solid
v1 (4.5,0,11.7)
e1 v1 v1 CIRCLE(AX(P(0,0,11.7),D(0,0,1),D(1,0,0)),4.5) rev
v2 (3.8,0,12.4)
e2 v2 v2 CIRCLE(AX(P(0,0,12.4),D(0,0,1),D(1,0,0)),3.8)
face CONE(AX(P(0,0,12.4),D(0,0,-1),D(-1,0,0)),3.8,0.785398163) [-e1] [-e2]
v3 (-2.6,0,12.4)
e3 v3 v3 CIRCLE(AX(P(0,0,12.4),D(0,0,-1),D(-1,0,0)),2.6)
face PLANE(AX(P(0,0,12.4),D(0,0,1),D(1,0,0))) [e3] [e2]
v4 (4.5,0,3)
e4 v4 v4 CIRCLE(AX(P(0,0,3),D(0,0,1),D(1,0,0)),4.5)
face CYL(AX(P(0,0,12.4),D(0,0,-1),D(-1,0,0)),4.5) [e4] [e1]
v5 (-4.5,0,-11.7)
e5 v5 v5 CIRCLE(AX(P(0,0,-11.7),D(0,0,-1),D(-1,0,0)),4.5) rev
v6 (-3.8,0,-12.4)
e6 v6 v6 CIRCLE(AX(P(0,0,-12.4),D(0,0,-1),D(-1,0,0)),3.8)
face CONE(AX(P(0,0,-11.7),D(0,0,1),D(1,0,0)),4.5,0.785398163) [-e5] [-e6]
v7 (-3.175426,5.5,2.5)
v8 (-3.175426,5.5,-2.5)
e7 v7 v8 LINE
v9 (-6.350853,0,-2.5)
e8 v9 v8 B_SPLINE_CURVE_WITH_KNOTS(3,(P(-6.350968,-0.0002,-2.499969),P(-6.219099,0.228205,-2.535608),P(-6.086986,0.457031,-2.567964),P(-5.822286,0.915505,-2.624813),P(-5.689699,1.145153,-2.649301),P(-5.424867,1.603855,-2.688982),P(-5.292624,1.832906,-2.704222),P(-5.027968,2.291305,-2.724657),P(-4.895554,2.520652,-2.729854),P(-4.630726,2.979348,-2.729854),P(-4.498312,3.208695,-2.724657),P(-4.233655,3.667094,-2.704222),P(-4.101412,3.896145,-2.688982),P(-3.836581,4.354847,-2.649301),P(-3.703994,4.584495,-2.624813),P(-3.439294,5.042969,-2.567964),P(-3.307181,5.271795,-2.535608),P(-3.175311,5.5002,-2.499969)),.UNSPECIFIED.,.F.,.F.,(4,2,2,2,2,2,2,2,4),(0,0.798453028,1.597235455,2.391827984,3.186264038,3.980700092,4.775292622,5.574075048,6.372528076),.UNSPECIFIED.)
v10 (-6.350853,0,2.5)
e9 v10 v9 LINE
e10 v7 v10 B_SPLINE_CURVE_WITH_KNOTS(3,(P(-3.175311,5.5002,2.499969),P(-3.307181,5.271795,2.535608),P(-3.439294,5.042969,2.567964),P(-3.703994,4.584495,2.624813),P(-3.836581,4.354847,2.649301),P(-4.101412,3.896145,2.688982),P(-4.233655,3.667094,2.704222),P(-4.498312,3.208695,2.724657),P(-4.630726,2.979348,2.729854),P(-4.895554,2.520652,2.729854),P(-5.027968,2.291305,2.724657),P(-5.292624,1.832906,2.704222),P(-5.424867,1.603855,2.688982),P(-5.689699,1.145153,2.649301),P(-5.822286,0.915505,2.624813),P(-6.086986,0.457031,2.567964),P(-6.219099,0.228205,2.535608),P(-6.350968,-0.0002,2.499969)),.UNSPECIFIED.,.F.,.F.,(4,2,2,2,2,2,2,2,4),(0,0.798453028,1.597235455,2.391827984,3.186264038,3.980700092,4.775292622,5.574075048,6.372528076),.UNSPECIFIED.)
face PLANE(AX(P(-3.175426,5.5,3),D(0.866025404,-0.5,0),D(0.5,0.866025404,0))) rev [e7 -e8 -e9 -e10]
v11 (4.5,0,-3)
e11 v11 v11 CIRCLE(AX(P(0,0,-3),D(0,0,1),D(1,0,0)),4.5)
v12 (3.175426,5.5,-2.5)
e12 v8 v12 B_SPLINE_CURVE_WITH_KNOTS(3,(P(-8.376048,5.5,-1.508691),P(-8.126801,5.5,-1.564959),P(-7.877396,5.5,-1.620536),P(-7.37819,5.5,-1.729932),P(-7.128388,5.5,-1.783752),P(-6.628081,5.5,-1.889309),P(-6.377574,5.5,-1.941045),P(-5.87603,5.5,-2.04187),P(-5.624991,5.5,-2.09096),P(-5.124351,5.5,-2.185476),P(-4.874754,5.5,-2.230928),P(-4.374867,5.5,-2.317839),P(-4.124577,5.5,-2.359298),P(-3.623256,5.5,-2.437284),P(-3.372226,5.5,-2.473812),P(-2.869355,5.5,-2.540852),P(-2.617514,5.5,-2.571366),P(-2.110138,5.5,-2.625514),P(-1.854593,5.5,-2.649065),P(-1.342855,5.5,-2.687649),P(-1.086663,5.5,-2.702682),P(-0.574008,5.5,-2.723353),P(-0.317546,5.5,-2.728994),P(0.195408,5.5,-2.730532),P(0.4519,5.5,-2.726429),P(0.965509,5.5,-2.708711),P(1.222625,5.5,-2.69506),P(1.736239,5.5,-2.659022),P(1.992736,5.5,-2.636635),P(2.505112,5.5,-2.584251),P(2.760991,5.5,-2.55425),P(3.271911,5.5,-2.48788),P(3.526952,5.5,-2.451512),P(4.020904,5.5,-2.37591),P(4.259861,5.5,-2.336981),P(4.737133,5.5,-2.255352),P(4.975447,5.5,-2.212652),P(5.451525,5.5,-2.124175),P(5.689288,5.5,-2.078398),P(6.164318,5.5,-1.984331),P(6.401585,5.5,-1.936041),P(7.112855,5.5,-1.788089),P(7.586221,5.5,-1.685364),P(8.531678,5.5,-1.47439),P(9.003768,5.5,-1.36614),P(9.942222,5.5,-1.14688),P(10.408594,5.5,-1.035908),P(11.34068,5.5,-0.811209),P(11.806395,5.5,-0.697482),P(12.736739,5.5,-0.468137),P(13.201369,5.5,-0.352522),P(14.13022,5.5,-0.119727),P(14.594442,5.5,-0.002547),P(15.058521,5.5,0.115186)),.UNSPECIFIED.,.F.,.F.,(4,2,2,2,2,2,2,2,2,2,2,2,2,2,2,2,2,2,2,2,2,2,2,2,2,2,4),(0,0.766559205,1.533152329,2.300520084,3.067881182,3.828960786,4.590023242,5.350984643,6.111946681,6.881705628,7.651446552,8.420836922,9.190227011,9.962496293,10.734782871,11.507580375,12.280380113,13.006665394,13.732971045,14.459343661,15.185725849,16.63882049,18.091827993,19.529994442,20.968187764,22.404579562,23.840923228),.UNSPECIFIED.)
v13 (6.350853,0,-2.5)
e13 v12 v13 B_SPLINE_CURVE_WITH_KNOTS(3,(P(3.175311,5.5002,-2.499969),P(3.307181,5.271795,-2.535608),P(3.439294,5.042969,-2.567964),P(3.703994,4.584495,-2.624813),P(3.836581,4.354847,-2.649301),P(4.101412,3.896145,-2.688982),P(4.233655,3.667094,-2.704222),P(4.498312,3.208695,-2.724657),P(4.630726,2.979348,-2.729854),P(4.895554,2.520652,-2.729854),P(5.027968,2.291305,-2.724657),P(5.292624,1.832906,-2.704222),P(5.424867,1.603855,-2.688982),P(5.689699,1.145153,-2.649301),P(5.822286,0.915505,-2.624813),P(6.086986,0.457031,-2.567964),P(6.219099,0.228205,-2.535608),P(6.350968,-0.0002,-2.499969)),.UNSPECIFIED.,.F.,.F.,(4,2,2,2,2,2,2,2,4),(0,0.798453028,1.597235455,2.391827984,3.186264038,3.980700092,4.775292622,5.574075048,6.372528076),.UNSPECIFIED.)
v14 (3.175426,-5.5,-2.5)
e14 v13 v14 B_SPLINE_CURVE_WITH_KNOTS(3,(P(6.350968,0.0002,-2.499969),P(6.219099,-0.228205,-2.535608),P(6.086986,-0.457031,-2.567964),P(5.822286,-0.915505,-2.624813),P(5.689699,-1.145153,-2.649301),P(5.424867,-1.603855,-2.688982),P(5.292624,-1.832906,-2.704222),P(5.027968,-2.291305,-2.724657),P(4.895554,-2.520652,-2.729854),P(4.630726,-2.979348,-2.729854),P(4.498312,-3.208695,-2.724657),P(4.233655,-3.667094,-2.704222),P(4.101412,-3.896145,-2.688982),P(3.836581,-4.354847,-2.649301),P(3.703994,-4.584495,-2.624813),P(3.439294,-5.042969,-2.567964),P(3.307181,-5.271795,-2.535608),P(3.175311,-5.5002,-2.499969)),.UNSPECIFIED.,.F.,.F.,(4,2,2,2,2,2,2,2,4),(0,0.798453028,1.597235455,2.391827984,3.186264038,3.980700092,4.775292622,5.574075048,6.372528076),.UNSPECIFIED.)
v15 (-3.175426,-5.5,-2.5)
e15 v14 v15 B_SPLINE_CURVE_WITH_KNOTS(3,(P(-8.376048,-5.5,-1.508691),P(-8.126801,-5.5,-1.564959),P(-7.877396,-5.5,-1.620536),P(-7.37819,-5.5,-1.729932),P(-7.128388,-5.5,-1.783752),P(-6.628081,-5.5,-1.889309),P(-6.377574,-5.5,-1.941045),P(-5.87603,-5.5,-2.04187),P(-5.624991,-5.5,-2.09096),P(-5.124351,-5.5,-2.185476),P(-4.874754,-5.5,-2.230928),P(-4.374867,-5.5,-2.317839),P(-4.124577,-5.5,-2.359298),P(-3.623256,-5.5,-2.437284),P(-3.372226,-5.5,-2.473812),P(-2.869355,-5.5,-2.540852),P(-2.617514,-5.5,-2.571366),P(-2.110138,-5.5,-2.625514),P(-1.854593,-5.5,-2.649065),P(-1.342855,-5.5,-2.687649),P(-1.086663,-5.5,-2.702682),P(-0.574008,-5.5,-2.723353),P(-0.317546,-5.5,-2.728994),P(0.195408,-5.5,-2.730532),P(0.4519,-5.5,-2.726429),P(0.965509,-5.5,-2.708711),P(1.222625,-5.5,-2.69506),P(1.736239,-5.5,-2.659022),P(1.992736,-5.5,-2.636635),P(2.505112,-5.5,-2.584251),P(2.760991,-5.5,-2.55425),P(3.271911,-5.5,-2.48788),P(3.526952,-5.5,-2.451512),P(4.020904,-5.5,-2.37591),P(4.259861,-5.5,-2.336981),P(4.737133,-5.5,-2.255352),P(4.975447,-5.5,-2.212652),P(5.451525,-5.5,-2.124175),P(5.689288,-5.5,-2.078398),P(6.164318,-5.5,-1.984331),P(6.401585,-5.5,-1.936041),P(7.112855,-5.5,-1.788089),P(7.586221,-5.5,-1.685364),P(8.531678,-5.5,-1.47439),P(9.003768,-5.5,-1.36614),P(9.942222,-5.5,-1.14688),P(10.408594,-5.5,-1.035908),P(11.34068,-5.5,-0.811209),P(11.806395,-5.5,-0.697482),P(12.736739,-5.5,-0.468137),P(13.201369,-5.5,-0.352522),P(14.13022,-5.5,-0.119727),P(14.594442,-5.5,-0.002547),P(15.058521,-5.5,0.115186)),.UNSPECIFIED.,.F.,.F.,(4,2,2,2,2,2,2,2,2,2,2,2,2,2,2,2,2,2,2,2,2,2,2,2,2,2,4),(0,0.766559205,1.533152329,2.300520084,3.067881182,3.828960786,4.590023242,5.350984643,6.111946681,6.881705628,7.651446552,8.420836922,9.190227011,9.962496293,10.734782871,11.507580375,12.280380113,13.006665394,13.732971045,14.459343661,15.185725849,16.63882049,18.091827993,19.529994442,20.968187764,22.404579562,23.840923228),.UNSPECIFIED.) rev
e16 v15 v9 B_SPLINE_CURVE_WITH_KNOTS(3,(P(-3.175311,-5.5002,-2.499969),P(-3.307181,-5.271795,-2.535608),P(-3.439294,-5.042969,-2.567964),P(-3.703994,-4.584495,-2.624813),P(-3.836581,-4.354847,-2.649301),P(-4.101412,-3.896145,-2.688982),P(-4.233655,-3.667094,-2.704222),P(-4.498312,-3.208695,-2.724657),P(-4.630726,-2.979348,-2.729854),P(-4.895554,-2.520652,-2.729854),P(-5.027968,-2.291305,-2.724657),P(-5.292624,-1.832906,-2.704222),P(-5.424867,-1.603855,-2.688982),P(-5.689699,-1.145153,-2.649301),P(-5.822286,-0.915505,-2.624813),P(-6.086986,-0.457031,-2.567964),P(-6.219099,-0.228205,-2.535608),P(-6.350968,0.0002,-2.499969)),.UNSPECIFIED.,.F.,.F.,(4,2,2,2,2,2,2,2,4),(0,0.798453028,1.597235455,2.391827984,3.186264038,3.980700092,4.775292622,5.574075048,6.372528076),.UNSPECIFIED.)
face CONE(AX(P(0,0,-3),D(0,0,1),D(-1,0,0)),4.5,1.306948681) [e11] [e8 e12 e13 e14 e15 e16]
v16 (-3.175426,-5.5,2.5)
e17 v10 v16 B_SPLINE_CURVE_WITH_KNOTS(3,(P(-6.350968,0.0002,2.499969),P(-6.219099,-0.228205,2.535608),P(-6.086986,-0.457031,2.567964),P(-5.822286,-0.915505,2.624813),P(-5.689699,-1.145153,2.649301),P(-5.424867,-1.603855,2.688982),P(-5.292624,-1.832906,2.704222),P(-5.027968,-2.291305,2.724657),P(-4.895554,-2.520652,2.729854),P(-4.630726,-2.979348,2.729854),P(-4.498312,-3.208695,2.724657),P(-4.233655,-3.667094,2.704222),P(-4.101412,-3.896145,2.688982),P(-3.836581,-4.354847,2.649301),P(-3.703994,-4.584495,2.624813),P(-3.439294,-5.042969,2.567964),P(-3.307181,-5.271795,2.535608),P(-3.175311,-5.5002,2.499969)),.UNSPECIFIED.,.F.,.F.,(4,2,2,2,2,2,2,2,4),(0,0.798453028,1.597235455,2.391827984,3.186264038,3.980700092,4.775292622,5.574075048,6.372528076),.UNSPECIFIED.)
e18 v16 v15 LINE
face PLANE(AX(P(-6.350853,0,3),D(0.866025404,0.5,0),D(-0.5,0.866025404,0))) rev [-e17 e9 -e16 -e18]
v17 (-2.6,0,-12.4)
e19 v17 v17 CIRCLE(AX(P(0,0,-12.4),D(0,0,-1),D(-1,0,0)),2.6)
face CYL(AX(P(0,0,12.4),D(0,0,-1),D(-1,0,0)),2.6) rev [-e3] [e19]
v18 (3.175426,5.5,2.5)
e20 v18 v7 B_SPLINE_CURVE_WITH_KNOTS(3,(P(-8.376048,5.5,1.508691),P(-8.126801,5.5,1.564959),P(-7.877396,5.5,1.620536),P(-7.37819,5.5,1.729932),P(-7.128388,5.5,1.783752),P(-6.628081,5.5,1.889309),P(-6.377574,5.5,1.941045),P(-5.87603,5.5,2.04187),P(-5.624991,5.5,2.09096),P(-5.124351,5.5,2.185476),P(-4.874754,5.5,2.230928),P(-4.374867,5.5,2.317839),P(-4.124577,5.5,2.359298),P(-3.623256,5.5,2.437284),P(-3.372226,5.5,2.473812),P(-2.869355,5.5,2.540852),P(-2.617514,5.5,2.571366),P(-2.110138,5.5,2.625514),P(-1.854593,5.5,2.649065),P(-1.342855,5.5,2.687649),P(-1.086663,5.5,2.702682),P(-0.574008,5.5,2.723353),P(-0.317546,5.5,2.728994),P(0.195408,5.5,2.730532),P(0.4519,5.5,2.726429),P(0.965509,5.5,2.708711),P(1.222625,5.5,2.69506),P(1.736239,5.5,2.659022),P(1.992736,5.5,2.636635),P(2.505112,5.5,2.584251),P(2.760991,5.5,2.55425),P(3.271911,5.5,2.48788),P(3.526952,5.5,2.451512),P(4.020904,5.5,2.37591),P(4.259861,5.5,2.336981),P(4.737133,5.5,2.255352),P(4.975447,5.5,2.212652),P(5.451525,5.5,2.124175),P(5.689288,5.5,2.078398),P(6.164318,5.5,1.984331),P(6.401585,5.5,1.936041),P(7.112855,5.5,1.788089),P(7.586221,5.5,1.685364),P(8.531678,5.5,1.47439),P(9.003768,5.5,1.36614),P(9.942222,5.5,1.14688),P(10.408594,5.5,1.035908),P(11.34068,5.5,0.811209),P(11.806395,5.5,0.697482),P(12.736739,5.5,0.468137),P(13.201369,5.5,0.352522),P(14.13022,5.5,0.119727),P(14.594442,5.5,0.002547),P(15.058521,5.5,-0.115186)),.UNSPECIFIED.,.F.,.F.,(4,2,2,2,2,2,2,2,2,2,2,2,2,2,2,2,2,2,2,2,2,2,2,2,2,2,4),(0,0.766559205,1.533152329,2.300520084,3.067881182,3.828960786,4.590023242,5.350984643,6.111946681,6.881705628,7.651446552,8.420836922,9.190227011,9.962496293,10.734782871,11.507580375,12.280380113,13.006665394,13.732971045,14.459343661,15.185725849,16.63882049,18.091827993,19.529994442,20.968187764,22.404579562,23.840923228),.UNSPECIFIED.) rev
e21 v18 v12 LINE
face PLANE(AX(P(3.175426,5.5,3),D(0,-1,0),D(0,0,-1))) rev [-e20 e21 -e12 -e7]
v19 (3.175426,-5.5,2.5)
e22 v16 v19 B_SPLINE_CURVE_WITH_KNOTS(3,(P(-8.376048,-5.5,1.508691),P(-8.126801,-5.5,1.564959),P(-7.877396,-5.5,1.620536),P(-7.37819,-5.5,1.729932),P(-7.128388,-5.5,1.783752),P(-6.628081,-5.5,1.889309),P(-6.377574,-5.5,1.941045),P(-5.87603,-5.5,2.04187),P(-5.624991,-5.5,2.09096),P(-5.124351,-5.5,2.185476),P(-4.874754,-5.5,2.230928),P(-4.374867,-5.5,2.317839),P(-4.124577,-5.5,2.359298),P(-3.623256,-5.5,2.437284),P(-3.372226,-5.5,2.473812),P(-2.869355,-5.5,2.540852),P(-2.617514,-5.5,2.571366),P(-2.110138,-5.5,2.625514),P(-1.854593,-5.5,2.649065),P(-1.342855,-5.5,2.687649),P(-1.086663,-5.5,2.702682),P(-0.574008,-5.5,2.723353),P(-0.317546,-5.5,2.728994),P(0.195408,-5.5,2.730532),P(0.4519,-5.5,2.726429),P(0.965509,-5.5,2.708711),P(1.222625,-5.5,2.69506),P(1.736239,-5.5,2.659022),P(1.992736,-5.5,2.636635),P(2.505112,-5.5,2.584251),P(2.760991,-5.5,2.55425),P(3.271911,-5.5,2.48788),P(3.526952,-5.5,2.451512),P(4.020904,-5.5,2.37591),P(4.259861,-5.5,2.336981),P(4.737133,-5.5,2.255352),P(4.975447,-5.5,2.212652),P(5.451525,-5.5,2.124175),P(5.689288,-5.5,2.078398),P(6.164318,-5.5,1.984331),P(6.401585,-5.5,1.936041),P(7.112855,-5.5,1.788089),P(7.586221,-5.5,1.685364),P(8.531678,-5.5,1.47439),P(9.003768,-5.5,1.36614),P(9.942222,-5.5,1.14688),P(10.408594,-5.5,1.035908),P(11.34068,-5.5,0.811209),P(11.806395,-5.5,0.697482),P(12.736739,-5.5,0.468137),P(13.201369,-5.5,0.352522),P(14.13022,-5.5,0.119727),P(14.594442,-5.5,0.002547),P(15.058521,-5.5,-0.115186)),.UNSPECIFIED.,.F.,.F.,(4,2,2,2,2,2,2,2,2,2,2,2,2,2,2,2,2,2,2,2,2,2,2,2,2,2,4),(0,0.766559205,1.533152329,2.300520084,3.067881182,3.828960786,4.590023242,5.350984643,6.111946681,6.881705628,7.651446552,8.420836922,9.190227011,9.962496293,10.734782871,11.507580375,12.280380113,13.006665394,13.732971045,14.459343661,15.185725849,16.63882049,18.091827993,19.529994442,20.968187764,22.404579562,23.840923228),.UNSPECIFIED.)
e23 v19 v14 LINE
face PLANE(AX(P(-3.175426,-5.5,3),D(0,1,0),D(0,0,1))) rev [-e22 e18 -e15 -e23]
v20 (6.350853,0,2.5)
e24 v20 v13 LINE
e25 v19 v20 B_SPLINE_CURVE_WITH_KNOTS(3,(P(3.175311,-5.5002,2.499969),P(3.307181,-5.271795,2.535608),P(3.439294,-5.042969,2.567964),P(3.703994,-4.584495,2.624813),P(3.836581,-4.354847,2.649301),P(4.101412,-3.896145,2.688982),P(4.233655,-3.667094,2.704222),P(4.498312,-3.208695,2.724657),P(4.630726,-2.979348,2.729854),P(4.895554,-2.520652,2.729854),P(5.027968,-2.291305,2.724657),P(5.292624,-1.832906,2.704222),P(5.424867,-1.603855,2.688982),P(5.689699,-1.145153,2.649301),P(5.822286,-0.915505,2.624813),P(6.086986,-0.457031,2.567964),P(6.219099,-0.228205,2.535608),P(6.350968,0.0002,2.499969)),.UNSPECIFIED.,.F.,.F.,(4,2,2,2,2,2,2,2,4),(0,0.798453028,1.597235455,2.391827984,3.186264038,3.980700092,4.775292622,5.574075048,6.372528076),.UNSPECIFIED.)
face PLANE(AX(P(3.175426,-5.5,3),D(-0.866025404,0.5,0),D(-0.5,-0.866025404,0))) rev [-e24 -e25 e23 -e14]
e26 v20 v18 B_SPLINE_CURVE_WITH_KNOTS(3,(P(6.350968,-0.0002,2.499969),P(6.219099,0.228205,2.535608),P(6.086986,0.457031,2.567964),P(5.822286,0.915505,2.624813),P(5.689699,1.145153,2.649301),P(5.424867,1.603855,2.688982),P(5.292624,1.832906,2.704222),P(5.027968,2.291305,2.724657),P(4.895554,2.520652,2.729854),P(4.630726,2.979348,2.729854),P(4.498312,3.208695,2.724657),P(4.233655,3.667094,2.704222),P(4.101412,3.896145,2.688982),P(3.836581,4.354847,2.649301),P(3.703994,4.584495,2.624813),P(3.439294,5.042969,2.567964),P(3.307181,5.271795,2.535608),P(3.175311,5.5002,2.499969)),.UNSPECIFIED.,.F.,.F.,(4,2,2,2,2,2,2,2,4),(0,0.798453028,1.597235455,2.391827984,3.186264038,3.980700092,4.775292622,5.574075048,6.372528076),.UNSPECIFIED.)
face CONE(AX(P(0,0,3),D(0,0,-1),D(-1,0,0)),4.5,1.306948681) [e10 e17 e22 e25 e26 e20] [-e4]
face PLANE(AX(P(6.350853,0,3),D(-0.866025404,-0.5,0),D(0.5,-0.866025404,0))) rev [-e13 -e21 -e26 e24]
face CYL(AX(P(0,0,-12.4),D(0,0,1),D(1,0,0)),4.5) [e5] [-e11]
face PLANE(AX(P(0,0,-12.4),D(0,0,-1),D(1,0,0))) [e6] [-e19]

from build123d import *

# Parameters (mm, degrees)
BOSS_EXTRUDE1_DEPTH = 3
SKETCH2_R           = 4.5
BOSS_EXTRUDE2_DEPTH = 9.4
SKETCH3_R           = 2.6
CUT_EXTRUDE1_DEPTH  = 15.978095117
CHAMFER2_SIZE       = 0.7


with BuildPart() as part:
    # Sketch1 → Boss-Extrude1 (new body)
    with BuildSketch(Plane.XY):
        Polygon((6.350852961, 0), (3.175426481, 5.5), (-3.175426481, 5.5), (-6.350852961, 0), (-3.175426481, -5.5), (3.175426481, -5.5), align=None)
    boss_extrude1 = extrude(amount=BOSS_EXTRUDE1_DEPTH)

    # Sketch2 → Boss-Extrude2 (add)
    with BuildSketch(Plane.XY.offset(3)):
        Circle(SKETCH2_R)
    boss_extrude2 = extrude(amount=BOSS_EXTRUDE2_DEPTH)

    # Sketch3 → Cut-Extrude1 (cut, through all)
    with BuildSketch(Plane(origin=(0, 0, 0), x_dir=(-1, 0, 0), z_dir=(0, 0, -1))):
        Circle(SKETCH3_R)
    cut_extrude1 = extrude(amount=-CUT_EXTRUDE1_DEPTH, mode=Mode.SUBTRACT)

    # Sketch5 → Cut-Revolve2 (revolve, cut)
    with BuildSketch(Plane(origin=(0, 0, 0), x_dir=(1, 0, 0), z_dir=(0, 1, 0))):
        Polygon((-4.5, -3), (-6.350852961, -3), (-6.350852961, -2.5), align=None)
    cut_revolve2 = revolve(axis=Axis((0, 0, 12.4), (0, 0, -1)), mode=Mode.SUBTRACT)

    # Mirror3: Boss-Extrude1, Boss-Extrude2, Cut-Extrude1, Cut-Revolve2 across plane
    add(boss_extrude1.mirror(Plane.XY))
    add(boss_extrude2.mirror(Plane.XY))
    add(cut_extrude1.mirror(Plane.XY), mode=Mode.SUBTRACT)
    add(cut_revolve2.mirror(Plane.XY), mode=Mode.SUBTRACT)

    # Chamfer2
    chamfer2_edges = [part.edges().sort_by_distance(p)[0] for p in [
        (-4.5, 0, -12.4),
        (-4.5, 0, 12.4),
    ]]
    chamfer(chamfer2_edges, length=CHAMFER2_SIZE)


solid = part.part
